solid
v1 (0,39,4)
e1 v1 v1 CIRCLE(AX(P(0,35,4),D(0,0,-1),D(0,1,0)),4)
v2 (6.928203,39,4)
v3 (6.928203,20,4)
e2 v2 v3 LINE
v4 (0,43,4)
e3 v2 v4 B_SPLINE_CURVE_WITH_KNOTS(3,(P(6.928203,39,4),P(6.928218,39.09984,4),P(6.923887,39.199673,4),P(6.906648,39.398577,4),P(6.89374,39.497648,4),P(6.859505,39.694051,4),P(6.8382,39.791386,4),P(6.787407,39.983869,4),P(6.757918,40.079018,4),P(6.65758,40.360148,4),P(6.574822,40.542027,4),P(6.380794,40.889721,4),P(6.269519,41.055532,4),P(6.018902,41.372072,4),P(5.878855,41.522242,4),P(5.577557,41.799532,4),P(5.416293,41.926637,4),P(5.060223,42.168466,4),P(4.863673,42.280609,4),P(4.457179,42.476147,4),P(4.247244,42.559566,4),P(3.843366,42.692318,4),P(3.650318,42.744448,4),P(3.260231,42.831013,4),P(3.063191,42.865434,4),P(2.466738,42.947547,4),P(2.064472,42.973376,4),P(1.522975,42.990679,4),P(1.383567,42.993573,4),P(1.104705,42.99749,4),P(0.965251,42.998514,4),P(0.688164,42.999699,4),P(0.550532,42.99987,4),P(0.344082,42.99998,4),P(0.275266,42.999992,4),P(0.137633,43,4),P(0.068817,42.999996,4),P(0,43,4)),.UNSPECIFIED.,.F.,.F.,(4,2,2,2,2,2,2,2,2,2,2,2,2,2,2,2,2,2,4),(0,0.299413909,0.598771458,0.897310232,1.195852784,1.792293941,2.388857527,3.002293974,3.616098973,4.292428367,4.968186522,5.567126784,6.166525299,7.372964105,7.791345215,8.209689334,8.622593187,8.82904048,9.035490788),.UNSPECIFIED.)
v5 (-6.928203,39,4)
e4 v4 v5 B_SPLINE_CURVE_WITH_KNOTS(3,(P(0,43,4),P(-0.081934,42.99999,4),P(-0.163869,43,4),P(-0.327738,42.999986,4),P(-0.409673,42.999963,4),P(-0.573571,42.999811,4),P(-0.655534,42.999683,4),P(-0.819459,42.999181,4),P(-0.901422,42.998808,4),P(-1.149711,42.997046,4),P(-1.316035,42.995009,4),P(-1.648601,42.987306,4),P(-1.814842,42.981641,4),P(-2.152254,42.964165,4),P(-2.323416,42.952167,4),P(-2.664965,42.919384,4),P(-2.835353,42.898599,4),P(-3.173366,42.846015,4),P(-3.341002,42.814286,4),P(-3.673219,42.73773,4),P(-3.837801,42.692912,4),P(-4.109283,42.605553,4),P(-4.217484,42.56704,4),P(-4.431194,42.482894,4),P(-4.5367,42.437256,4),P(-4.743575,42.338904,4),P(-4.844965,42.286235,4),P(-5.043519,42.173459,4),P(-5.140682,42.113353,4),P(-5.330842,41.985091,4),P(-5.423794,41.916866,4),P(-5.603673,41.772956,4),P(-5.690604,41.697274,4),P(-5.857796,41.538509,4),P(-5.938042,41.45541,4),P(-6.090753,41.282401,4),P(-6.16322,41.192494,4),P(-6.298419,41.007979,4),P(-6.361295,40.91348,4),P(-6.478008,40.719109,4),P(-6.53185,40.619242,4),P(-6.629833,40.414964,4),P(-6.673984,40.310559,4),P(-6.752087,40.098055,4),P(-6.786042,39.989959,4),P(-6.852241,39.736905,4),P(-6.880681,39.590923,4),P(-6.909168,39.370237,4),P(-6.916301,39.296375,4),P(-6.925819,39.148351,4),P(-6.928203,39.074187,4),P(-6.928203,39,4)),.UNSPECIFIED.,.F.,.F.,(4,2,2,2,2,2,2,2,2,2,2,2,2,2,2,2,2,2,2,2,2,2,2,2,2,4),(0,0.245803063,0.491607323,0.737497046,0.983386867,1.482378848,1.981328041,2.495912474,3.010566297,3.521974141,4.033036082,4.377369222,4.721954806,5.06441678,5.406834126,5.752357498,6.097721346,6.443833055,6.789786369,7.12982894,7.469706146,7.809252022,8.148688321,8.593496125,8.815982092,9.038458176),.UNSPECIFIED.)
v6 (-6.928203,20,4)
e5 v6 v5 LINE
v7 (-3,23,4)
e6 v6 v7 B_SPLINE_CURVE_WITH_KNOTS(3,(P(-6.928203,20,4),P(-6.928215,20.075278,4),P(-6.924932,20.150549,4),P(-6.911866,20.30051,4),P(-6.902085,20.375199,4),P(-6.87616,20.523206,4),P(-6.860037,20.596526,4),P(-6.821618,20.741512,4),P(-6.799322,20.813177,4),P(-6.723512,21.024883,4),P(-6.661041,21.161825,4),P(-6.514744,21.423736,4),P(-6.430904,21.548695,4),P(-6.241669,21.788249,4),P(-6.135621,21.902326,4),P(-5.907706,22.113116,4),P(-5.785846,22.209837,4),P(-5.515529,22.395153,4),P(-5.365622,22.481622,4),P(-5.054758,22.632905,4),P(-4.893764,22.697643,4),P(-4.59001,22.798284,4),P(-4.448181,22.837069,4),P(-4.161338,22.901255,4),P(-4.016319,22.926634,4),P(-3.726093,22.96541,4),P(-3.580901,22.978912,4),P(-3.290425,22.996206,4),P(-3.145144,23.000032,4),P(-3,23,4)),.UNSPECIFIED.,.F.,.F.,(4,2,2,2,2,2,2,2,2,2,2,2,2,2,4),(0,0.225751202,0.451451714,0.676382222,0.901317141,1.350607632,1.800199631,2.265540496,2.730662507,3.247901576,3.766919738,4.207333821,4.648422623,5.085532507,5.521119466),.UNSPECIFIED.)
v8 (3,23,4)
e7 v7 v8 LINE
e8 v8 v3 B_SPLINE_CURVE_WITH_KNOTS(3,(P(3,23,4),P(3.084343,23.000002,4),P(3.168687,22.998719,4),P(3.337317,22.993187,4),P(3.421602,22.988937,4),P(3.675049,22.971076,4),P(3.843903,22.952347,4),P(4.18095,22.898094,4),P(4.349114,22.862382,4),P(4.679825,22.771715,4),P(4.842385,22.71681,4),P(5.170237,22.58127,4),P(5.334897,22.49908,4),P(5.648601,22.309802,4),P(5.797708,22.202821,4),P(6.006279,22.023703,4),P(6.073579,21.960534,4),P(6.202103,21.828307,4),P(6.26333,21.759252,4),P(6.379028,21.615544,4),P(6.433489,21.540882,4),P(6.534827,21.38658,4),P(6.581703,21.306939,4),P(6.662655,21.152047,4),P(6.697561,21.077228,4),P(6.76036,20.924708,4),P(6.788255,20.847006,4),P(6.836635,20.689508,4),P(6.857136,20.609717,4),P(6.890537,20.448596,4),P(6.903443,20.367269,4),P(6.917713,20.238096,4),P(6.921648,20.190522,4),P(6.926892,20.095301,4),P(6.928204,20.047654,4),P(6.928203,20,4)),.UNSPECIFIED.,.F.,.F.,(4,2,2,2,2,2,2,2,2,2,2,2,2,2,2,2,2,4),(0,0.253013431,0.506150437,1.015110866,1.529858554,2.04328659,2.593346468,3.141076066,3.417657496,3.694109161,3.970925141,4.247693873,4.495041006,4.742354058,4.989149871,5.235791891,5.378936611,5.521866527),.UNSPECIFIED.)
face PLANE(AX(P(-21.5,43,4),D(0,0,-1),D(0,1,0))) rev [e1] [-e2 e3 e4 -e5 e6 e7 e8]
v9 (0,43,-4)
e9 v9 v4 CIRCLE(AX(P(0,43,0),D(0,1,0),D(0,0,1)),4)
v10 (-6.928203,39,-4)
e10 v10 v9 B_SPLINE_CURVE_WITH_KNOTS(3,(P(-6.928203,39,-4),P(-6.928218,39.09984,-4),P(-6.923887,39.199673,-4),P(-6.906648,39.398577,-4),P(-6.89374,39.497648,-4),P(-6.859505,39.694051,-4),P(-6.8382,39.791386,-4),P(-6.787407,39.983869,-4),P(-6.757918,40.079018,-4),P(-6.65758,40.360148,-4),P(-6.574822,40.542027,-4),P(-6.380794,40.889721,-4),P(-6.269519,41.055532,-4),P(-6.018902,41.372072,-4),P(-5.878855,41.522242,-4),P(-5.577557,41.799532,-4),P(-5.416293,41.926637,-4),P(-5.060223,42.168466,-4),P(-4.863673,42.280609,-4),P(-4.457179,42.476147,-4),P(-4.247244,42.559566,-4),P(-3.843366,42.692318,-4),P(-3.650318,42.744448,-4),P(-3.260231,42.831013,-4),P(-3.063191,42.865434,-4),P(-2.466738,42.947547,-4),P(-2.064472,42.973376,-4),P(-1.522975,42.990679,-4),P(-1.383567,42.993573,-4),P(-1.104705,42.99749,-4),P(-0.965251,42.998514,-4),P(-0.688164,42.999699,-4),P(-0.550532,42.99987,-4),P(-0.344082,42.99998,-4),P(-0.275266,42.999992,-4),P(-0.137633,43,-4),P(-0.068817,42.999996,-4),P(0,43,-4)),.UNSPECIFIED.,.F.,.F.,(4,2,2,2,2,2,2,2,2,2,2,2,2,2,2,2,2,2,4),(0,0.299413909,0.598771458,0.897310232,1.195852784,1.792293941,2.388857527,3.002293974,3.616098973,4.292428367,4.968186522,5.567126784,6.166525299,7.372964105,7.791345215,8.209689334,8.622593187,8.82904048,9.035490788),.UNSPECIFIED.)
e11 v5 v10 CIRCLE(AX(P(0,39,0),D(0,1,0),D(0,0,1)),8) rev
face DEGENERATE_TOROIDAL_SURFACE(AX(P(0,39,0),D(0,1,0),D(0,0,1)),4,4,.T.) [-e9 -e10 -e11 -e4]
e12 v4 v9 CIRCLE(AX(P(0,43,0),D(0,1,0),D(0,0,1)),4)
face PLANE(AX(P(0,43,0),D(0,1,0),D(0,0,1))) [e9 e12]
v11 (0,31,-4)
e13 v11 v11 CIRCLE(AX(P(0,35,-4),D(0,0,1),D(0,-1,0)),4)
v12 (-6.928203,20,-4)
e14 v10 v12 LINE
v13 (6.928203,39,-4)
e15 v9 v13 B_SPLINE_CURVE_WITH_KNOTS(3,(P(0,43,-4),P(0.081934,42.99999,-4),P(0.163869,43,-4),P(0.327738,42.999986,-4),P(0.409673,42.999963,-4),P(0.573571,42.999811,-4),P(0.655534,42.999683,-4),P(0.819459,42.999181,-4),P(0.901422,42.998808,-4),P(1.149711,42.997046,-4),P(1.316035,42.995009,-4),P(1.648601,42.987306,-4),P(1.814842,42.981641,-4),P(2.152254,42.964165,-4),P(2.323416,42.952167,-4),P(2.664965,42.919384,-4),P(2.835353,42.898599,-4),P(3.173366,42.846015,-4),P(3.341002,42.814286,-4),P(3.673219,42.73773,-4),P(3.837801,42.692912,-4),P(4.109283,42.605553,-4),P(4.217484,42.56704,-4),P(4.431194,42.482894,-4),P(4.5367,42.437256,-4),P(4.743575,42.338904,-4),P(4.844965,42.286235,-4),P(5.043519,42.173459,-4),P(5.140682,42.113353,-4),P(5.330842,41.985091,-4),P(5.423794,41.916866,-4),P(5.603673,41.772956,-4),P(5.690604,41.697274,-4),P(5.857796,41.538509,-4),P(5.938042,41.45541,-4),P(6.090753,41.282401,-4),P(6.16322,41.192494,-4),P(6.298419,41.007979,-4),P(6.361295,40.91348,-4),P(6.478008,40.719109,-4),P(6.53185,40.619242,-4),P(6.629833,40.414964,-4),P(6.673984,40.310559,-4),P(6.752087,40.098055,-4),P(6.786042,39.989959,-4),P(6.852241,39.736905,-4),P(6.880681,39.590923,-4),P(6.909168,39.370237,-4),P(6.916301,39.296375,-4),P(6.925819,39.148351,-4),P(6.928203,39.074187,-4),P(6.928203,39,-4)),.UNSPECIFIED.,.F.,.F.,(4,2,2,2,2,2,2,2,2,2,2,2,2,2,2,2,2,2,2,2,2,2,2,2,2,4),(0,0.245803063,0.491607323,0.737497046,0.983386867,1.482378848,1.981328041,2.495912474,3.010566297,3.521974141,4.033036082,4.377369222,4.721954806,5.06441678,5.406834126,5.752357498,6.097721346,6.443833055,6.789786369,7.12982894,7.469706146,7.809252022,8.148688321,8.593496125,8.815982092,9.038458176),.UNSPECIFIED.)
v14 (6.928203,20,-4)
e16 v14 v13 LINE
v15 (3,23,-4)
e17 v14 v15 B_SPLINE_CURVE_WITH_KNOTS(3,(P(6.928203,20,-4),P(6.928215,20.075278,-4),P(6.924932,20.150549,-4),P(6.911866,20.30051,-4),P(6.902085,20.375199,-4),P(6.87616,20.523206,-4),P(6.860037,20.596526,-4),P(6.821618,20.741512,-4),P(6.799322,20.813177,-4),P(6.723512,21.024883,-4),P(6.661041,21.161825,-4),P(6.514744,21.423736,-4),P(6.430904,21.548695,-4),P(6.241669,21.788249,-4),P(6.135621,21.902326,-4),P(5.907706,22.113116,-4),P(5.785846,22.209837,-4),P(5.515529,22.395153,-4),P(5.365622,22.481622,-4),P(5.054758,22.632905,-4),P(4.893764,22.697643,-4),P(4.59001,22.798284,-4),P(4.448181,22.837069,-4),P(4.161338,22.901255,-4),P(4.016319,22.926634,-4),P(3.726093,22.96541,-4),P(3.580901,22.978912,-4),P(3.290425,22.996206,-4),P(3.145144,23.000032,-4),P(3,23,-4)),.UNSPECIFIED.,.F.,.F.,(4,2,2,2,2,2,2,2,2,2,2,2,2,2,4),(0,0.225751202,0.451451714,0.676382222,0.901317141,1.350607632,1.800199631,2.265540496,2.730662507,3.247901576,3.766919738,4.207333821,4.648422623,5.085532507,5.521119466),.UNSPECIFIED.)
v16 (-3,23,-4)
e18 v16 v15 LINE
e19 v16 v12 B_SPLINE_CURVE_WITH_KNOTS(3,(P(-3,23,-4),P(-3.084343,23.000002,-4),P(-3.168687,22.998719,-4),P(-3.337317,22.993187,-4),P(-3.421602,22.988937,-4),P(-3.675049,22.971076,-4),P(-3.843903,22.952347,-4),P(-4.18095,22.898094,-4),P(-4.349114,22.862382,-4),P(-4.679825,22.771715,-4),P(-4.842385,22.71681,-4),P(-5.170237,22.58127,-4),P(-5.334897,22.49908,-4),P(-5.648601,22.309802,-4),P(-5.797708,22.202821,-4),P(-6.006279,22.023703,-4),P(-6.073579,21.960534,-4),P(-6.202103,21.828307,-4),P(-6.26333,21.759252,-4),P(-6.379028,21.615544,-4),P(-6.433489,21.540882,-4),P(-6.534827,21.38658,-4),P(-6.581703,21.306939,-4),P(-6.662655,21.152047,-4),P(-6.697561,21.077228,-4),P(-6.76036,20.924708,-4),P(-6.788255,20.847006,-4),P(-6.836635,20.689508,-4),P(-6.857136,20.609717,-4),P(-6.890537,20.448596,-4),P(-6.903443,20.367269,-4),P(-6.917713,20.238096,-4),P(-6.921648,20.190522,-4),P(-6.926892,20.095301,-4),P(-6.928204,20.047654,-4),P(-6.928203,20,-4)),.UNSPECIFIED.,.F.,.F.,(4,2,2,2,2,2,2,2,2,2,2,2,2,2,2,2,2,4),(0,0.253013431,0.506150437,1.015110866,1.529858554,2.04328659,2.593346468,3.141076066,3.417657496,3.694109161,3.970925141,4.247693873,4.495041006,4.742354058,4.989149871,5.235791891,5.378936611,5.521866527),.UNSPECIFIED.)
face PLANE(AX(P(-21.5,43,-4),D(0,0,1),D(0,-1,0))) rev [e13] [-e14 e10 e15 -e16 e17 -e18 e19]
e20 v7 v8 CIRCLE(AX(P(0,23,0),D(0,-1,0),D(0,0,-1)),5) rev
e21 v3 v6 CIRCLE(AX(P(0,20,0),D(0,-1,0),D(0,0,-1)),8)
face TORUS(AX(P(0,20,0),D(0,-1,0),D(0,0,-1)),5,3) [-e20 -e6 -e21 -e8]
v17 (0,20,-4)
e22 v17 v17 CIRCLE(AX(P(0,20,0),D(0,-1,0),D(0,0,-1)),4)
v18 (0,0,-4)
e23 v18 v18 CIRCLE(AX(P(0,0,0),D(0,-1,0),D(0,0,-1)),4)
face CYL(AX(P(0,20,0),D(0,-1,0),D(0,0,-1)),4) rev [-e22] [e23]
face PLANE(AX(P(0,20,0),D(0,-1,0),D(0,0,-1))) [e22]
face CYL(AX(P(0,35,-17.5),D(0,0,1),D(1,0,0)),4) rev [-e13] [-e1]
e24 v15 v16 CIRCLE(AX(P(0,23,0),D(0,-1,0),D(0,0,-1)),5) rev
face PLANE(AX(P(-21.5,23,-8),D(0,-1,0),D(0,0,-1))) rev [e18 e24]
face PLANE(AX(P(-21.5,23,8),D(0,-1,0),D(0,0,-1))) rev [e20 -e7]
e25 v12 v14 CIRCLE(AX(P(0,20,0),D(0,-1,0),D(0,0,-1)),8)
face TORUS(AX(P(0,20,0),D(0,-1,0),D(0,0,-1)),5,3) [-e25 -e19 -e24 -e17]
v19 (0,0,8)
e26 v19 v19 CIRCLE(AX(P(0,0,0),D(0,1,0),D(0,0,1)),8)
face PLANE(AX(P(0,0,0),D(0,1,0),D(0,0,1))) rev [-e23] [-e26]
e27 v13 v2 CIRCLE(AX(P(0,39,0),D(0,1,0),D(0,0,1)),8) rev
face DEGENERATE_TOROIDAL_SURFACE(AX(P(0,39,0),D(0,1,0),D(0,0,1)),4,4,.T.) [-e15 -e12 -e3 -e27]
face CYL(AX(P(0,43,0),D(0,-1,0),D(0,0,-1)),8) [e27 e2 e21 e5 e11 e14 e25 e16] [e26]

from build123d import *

# Parameters (mm, degrees)
SKETCH_1_R          = 8
EXTRUDE_1_DEPTH     = 43
SKETCH_2_W          = 4
SKETCH_2_H          = 20
CUT_EXTRUDE_1_DEPTH = 21.5
FILLET_1_R          = 3
FILLET_2_R          = 4
SKETCH_3_R          = 4
CUT_EXTRUDE_2_DEPTH = 21.5
SKETCH_4_R          = 4
CUT_EXTRUDE_3_DEPTH = 20


with BuildPart() as part:
    # 草图1 → 凸台-拉伸1 (new body)
    with BuildSketch(Plane(origin=(0, 0, 0), x_dir=(1, 0, 0), z_dir=(0, 1, 0))):
        with Locations(Location((0, 0, 0), (0, 0, 270))):
            Circle(SKETCH_1_R)
    extrude(amount=EXTRUDE_1_DEPTH)

    # 草图2 → 切除-拉伸1 (cut, symmetric)
    with BuildSketch(Plane(origin=(0, 0, 0), x_dir=(0, 0, -1), z_dir=(1, 0, 0))):
        with Locations((-6, 33)):
            Rectangle(SKETCH_2_W, SKETCH_2_H)
        with Locations((6, 33)):
            Rectangle(SKETCH_2_W, SKETCH_2_H)
    extrude(amount=CUT_EXTRUDE_1_DEPTH, both=True, mode=Mode.SUBTRACT)

    # 圆角1
    fillet_1_edges = [part.edges().sort_by_distance(p)[0] for p in [
        (-4, 23, 6.92820323),
        (0, 23, -8),
    ]]
    fillet(fillet_1_edges, radius=FILLET_1_R)

    # 圆角2
    fillet_2_edges = [part.edges().sort_by_distance(p)[0] for p in [
        (8, 43, 0),
        (-8, 43, 0),
    ]]
    fillet(fillet_2_edges, radius=FILLET_2_R - 0.0001)  # a hair under: the kernel refuses the full size

    # 草图3 → 切除-拉伸2 (cut, symmetric)
    with BuildSketch(Plane.XY.offset(4)):
        with Locations(Location((0, 35, 0), (0, 0, 90))):
            Circle(SKETCH_3_R)
    extrude(amount=CUT_EXTRUDE_2_DEPTH, both=True, mode=Mode.SUBTRACT)

    # 草图4 → 切除-拉伸3 (cut)
    with BuildSketch(Plane.XZ):
        with Locations(Location((0, 0, 0), (0, 0, 270))):
            Circle(SKETCH_4_R)
    extrude(amount=-CUT_EXTRUDE_3_DEPTH, mode=Mode.SUBTRACT)


solid = part.part
